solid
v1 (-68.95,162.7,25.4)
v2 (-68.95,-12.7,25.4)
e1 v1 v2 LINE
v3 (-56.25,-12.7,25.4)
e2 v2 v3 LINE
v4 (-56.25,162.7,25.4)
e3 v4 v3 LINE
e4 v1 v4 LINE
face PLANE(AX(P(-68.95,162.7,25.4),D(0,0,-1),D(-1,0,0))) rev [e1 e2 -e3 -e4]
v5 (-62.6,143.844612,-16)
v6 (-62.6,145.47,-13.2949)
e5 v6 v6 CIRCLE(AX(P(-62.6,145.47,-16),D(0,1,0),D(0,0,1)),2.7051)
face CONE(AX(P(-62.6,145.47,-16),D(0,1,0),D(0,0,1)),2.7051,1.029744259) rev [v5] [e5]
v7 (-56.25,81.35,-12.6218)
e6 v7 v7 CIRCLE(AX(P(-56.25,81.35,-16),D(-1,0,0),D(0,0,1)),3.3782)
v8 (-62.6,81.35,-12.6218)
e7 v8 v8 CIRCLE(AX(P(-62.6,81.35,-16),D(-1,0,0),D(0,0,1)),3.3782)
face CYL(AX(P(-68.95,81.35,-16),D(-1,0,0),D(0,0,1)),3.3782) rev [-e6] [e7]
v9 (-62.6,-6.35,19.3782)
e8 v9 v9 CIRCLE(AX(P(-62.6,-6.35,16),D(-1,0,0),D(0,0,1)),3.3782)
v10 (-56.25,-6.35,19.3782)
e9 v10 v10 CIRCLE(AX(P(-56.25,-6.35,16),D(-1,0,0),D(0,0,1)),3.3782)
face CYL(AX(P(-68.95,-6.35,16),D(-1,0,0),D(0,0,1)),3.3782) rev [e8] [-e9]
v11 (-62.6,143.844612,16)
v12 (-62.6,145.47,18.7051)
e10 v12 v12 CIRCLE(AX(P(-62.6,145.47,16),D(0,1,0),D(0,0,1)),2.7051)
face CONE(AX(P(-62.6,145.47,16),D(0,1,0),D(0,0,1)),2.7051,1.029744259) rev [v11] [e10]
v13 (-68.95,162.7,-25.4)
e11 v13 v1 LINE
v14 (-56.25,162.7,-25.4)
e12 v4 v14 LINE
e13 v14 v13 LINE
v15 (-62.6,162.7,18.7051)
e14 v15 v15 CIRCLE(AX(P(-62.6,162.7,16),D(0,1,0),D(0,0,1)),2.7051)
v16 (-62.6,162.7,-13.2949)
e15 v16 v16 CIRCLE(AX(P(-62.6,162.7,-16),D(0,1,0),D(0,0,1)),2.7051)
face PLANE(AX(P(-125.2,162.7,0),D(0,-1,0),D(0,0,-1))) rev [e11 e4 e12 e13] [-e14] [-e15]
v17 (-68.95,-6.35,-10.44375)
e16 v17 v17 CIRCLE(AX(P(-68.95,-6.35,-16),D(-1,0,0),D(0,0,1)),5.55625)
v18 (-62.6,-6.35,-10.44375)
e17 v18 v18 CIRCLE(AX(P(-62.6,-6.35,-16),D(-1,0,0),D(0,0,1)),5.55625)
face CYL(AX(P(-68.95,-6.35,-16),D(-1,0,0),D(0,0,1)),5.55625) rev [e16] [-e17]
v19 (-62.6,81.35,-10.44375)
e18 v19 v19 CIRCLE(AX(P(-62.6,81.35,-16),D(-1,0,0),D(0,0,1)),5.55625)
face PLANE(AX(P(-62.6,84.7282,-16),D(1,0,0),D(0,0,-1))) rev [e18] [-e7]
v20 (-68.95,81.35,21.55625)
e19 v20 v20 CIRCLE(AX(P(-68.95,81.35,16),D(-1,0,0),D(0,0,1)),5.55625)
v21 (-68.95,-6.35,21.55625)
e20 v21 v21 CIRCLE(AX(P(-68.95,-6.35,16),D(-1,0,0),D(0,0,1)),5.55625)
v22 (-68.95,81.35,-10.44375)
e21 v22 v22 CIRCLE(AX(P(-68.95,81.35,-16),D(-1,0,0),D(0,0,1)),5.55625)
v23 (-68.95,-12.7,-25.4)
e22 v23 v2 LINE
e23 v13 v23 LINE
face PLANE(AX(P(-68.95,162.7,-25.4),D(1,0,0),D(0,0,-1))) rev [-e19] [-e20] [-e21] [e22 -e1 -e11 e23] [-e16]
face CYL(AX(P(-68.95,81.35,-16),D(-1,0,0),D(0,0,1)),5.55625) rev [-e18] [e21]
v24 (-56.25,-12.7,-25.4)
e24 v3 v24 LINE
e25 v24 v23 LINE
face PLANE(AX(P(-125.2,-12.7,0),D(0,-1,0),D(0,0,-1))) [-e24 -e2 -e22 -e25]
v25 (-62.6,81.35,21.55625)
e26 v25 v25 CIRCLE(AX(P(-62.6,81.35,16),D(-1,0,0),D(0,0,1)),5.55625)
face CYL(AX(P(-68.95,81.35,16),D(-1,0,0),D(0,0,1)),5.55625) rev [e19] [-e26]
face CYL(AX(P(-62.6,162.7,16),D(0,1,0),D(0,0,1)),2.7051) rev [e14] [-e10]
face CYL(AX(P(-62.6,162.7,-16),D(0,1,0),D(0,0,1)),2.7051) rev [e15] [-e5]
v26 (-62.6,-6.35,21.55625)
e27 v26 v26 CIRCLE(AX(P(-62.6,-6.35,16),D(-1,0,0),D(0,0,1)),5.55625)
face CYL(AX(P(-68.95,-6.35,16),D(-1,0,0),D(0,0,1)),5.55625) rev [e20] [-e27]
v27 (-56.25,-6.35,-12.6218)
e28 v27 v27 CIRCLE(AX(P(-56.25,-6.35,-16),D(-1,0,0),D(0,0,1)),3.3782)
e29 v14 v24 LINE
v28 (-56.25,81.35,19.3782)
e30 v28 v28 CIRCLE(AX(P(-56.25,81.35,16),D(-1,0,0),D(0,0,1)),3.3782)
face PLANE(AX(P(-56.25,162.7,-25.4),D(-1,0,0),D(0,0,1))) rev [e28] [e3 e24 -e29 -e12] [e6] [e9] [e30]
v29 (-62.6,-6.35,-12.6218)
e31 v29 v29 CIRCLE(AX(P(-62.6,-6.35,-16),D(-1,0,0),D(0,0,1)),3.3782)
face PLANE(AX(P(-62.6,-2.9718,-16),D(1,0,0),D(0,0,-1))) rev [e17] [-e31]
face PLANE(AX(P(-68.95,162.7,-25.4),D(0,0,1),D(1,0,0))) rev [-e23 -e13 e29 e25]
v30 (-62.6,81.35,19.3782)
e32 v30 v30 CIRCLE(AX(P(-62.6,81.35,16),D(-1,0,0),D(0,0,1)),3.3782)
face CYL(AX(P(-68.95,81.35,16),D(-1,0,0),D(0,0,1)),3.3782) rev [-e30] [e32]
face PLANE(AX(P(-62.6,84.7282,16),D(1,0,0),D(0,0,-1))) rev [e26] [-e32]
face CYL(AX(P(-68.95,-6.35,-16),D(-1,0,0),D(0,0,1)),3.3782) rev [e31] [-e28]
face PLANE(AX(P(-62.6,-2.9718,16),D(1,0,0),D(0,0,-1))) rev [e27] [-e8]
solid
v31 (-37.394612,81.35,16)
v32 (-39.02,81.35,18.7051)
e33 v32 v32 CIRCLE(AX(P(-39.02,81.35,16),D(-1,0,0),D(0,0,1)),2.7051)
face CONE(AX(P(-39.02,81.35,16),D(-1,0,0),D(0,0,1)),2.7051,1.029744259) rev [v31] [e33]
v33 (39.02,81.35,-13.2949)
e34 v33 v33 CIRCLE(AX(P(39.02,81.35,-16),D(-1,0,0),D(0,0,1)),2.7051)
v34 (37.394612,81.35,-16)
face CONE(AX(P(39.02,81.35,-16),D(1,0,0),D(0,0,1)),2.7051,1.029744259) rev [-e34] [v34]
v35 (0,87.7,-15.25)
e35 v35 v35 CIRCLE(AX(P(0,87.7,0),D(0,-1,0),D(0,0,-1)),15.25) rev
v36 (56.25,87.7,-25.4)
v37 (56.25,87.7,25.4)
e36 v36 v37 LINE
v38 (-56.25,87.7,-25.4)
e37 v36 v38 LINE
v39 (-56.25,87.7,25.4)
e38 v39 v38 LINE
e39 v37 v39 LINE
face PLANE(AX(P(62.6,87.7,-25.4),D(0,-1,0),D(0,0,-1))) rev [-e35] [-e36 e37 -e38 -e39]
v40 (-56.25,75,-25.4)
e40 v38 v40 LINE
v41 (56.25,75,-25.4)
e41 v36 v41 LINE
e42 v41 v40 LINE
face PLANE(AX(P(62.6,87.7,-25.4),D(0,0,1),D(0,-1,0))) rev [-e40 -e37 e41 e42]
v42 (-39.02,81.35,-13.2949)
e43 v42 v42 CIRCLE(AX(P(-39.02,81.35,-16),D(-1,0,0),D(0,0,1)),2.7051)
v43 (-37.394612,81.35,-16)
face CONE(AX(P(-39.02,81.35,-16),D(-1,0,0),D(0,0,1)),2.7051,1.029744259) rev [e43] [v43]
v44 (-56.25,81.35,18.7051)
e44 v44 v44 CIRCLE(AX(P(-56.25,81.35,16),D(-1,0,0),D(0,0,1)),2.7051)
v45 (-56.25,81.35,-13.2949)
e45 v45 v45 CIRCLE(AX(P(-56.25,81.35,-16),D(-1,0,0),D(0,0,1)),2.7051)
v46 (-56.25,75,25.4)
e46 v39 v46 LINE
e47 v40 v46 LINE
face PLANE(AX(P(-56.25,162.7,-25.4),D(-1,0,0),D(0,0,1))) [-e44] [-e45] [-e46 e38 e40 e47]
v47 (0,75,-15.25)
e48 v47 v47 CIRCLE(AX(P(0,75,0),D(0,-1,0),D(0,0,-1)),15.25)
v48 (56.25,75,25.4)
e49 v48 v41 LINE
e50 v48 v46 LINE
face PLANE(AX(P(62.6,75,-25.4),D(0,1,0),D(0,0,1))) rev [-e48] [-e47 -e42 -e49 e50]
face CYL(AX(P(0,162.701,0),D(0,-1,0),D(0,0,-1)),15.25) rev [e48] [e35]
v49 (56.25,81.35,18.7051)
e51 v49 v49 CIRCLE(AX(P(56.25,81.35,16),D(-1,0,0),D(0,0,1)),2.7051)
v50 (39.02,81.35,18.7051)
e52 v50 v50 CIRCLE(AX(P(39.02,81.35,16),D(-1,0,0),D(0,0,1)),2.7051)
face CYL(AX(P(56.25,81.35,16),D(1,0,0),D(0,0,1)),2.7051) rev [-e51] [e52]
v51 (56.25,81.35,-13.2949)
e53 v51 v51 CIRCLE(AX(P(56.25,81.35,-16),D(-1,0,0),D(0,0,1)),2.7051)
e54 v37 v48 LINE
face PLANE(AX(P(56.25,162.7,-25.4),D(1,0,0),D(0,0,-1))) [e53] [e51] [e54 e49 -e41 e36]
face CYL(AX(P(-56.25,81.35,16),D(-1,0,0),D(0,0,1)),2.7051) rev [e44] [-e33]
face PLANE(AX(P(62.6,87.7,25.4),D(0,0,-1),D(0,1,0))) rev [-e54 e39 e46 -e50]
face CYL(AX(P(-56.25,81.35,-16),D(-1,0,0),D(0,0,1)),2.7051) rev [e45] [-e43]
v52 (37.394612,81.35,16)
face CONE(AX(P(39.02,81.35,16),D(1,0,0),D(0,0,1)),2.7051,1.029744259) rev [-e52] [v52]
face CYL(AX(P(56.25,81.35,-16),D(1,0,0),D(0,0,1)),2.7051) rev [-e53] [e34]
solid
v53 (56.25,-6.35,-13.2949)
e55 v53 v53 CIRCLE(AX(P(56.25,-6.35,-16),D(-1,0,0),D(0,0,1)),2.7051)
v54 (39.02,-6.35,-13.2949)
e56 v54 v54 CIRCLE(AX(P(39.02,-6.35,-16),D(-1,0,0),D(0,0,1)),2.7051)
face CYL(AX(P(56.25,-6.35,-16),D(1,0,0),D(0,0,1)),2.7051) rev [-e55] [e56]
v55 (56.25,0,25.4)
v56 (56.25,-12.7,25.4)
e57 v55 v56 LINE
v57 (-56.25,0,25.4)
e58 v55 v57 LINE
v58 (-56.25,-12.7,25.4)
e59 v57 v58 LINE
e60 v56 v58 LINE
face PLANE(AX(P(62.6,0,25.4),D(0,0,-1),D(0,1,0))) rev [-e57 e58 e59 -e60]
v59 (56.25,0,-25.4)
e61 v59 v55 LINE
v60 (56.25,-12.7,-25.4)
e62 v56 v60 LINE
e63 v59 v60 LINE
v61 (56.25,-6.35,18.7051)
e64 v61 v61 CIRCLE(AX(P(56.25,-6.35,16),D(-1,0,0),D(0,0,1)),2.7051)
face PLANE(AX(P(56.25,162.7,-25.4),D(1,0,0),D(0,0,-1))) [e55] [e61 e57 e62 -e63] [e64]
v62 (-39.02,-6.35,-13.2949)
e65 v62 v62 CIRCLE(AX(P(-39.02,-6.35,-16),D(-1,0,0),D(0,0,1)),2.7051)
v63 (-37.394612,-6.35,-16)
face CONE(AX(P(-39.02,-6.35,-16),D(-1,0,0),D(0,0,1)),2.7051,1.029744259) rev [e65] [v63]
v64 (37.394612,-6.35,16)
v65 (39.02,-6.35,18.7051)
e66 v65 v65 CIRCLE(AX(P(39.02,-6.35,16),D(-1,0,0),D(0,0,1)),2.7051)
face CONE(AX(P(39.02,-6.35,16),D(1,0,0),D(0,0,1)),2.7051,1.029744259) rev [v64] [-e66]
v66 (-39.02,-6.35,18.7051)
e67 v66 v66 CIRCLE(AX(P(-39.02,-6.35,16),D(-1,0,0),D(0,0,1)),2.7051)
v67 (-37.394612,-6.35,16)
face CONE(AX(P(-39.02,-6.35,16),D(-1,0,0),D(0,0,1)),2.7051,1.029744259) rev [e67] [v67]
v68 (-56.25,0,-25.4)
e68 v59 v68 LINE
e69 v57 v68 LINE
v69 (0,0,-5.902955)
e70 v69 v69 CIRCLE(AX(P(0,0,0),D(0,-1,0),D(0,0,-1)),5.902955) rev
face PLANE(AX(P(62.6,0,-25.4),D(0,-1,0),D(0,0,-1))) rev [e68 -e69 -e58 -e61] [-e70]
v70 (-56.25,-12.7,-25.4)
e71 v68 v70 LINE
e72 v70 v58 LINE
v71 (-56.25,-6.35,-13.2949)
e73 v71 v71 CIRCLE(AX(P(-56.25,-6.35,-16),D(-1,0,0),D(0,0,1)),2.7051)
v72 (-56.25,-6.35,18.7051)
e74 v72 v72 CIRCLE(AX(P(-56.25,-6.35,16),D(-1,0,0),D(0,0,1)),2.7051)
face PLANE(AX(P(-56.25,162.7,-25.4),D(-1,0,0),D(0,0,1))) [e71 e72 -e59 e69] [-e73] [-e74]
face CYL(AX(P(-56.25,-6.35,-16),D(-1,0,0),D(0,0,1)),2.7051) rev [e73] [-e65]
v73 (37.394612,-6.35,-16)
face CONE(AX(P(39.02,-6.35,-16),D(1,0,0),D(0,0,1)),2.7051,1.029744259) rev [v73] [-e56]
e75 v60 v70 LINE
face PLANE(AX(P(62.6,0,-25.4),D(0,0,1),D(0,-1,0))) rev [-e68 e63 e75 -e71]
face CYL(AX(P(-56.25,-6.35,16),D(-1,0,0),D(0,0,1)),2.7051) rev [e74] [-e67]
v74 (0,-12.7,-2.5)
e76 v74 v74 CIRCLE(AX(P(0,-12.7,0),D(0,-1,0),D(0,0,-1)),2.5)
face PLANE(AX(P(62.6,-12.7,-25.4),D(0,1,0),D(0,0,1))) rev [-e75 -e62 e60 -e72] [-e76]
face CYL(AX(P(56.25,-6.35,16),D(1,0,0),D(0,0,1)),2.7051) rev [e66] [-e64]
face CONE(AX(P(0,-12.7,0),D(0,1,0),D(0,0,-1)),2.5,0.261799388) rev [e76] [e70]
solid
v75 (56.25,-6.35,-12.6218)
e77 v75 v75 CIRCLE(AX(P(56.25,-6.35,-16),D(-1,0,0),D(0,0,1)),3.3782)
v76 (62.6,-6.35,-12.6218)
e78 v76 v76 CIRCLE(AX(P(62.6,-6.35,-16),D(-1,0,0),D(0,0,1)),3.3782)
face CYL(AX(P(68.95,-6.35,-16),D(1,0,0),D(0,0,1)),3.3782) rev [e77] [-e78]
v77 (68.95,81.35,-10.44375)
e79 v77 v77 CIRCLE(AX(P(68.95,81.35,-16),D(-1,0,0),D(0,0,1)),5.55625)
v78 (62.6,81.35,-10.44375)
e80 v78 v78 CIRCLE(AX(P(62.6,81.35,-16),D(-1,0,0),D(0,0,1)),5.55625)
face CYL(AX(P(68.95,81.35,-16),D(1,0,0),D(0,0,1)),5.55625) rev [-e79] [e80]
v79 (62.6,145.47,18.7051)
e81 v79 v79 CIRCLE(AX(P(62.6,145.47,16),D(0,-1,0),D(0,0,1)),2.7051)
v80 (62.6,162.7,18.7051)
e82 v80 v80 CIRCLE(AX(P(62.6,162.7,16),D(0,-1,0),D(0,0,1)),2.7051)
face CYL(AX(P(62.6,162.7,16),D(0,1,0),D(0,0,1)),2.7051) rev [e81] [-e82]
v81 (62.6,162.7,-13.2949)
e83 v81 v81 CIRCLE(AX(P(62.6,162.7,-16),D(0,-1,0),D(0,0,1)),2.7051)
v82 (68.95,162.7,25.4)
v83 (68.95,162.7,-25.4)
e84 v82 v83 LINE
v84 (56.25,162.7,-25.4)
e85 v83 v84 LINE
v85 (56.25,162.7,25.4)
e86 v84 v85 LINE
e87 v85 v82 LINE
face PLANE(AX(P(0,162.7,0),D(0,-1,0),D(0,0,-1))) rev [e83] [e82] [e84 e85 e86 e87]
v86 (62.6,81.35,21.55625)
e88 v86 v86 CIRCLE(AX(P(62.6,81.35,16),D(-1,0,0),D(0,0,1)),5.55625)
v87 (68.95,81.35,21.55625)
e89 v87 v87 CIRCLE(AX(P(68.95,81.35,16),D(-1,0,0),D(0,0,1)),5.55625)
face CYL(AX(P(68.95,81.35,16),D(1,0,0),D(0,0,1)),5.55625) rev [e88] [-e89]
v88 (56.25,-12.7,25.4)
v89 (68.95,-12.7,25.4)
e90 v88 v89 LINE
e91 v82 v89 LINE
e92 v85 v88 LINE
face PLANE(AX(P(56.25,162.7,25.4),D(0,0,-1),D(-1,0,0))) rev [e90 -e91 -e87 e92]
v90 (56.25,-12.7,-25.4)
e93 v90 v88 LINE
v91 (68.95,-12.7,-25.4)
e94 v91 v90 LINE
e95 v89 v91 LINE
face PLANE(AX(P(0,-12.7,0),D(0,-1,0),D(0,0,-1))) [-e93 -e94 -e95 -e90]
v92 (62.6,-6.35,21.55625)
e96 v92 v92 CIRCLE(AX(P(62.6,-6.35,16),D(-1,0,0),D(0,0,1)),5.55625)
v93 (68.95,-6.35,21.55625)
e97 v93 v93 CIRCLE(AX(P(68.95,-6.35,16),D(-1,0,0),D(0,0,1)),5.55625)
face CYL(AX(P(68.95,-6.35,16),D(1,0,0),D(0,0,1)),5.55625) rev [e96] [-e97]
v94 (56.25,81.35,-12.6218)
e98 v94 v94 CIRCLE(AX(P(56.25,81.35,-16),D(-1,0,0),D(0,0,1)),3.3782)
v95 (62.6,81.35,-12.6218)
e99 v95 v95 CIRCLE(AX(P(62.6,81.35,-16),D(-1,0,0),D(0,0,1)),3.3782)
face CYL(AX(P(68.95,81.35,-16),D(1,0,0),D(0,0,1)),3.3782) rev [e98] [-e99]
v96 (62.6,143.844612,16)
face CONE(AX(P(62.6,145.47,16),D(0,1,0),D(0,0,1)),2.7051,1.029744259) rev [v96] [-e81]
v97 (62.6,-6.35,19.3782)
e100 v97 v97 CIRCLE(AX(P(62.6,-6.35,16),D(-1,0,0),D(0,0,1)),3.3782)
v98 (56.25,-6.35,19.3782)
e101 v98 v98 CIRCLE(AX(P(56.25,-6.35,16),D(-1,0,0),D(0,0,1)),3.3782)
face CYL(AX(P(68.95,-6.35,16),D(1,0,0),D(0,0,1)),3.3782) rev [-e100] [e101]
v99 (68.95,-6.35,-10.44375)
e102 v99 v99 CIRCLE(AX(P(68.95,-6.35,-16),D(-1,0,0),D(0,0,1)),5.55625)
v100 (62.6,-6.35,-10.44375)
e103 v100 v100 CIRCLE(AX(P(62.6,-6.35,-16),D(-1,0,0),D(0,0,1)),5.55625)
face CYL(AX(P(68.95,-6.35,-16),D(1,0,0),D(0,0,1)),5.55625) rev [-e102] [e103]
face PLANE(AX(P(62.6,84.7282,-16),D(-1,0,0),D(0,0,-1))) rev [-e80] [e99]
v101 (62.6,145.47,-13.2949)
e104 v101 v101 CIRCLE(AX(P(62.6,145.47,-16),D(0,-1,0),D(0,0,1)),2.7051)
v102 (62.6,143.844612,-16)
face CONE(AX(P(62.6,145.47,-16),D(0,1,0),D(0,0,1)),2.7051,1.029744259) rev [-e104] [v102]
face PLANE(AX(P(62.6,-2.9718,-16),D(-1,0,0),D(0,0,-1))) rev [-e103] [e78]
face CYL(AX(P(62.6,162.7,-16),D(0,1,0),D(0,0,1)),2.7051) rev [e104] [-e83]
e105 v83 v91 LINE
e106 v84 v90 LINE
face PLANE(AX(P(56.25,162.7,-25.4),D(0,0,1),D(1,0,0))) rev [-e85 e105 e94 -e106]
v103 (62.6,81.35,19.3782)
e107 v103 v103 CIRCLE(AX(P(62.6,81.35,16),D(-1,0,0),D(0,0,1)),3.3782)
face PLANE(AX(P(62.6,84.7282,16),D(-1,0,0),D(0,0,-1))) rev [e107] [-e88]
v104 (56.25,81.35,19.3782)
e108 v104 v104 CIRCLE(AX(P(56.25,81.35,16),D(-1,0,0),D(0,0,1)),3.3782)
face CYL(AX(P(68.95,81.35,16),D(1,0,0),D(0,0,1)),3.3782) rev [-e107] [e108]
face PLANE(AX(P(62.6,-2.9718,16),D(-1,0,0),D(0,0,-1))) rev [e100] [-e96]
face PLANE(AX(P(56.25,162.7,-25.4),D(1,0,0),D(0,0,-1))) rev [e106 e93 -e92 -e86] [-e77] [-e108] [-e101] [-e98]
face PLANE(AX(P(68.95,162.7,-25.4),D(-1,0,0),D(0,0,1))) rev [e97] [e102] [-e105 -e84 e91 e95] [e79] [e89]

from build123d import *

# Parameters (mm, degrees)
CROQUIS13_W                                 = 50.8
CROQUIS13_H                                 = 12.7
SOLID_2_X_0_5_2_DEPTH                       = 175.4
CROQUIS13_ON_SEGMENT_2_W                    = 50.8
CROQUIS13_ON_SEGMENT_2_H                    = 12.7
SOLID_2_X_0_5_2_2_DEPTH                     = 175.4
CROQUIS13_ON_SEGMENT_3_W                    = 50.8
CROQUIS13_ON_SEGMENT_3_H                    = 12.7
SOLID_2_X_0_5_2_3_DEPTH                     = 127.2
CROQUIS13_ON_SEGMENT_4_W                    = 50.8
CROQUIS13_ON_SEGMENT_4_H                    = 12.7
SOLID_2_X_0_5_2_4_DEPTH                     = 127.2
REFRENTADO_PARA_TORNILLO_CON_CABEZA_2_COUNT = 2
REFRENTADO_PARA_TORNILLO_CON_CABEZA_2_PITCH = 87.7
REFRENTADO_PARA_TORNILLO_CON_CABEZA_3_COUNT = 2
REFRENTADO_PARA_TORNILLO_CON_CABEZA_3_PITCH = 93.355717554
REFRENTADO_PARA_TORNILLO_CON_CABEZA_4_COUNT = 2
REFRENTADO_PARA_TORNILLO_CON_CABEZA_4_PITCH = 32
SIMETR_A1_START                             = 62.6
SIMETR_A1_OUTLINE_R                         = 5.55625
SIMETR_A1_DEPTH                             = 6.35
SIMETR_A1_START_2                           = 56.25
SIMETR_A1_2_OUTLINE_R                       = 3.3782
SIMETR_A1_2_DEPTH                           = 6.35
CROQUIS19_R                                 = 15.25
CORTAR_EXTRUIR1_DEPTH                       = 12.7
CROQUIS20_R                                 = 2.5
CORTAR_EXTRUIR2_DEPTH                       = 12.7
CORTAR_EXTRUIR2_DRAFT                       = 15


# Read off the part's stored shape, not the designer's step: Simetría1
with BuildPart() as part:
    # Croquis13 → Solid 2 X 0.5(2) (new body)
    with BuildSketch(Plane(origin=(62.6, -12.7, 0), x_dir=(0, 0, 1), z_dir=(0, 1, 0))):
        Rectangle(CROQUIS13_W, CROQUIS13_H)
    extrude(amount=SOLID_2_X_0_5_2_DEPTH)

    # Simetría1 outline → Simetría1 (cut)
    with BuildSketch(Plane.YZ.offset(SIMETR_A1_START)):
        with Locations((-6.35, -16)):
            Circle(SIMETR_A1_OUTLINE_R)
        with Locations((81.35, -16)):
            Circle(SIMETR_A1_OUTLINE_R)
        with Locations((81.35, 16)):
            Circle(SIMETR_A1_OUTLINE_R)
        with Locations((-6.35, 16)):
            Circle(SIMETR_A1_OUTLINE_R)
    extrude(amount=SIMETR_A1_DEPTH, mode=Mode.SUBTRACT)

    # Simetr_a1 2 outline → Simetr_a1 2 (cut)
    with BuildSketch(Plane.YZ.offset(SIMETR_A1_START_2)):
        with Locations((-6.35, -16)):
            Circle(SIMETR_A1_2_OUTLINE_R)
        with Locations((81.35, -16)):
            Circle(SIMETR_A1_2_OUTLINE_R)
        with Locations((81.35, 16)):
            Circle(SIMETR_A1_2_OUTLINE_R)
        with Locations((-6.35, 16)):
            Circle(SIMETR_A1_2_OUTLINE_R)
    extrude(amount=SIMETR_A1_2_DEPTH, mode=Mode.SUBTRACT)

    # Simetr_a1 7 outline → Simetr_a1 7 (revolve, cut)
    with BuildSketch(Plane(origin=(62.6, 0, 16), x_dir=(1, 0, 0), z_dir=(0, 0, 1))):
        Polygon((0, 162.7), (0, 143.844611939), (2.7051, 145.47), (2.7051, 162.7), align=None)
    revolve(axis=Axis((62.6, 0, 16), (0, 1, 0)), mode=Mode.SUBTRACT)

    # Simetr_a1 8 outline → Simetr_a1 8 (revolve, cut)
    with BuildSketch(Plane(origin=(62.6, 0, -16), x_dir=(1, 0, 0), z_dir=(0, 0, 1))):
        Polygon((0, 162.7), (0, 143.844611939), (2.7051, 145.47), (2.7051, 162.7), align=None)
    revolve(axis=Axis((62.6, 0, -16), (0, 1, 0)), mode=Mode.SUBTRACT)


with BuildPart() as body_2:
    # Croquis13 on segment 2 (carried to segment 2) → Solid 2 X 0.5_2 2 (new body)
    with BuildSketch(Plane(origin=(-62.6, -12.7, 0), x_dir=(0, 0, 1), z_dir=(0, 1, 0))):
        Rectangle(CROQUIS13_ON_SEGMENT_2_W, CROQUIS13_ON_SEGMENT_2_H)
    extrude(amount=SOLID_2_X_0_5_2_2_DEPTH)

    # Croquis15 → Refrentado para tornillo con cabeza hueca de 1/41 (revolve, cut)
    with BuildSketch(Plane(origin=(-68.95, -6.35, 16), x_dir=(0, 0, 1), z_dir=(0, 1, 0))):
        Polygon((0, 0), (0, 137.9), (3.3782, 137.9), (3.3782, 6.35), (5.55625, 6.35), (5.55625, 0), align=None)
    refrentado_para_tornillo_con_cabeza_huec = revolve(axis=Axis((-75.3, -6.35, 16), (1, 0, 0)), mode=Mode.SUBTRACT)

    # Refrentado para tornillo con cabeza  2: Refrentado para tornillo con cabeza hueca de 1/41 ×2
    with Locations(*[(0, i * REFRENTADO_PARA_TORNILLO_CON_CABEZA_2_PITCH, 0) for i in range(1, REFRENTADO_PARA_TORNILLO_CON_CABEZA_2_COUNT)]):
        add(refrentado_para_tornillo_con_cabeza_huec, mode=Mode.SUBTRACT)

    # Refrentado para tornillo con cabeza  3: Refrentado para tornillo con cabeza hueca de 1/41 ×2
    with Locations(*[Vector(-1.1702116215866835e-15, 0.9394175557526336, -0.3427749348242189) * (i * REFRENTADO_PARA_TORNILLO_CON_CABEZA_3_PITCH) for i in range(1, REFRENTADO_PARA_TORNILLO_CON_CABEZA_3_COUNT)]):
        add(refrentado_para_tornillo_con_cabeza_huec, mode=Mode.SUBTRACT)

    # Refrentado para tornillo con cabeza  4: Refrentado para tornillo con cabeza hueca de 1/41 ×2
    with Locations(*[(0, 0, -i * REFRENTADO_PARA_TORNILLO_CON_CABEZA_4_PITCH) for i in range(1, REFRENTADO_PARA_TORNILLO_CON_CABEZA_4_COUNT)]):
        add(refrentado_para_tornillo_con_cabeza_huec, mode=Mode.SUBTRACT)

    # Croquis18 at point 3 (carried to point 3, square into its face) → Taladro roscado 1/4-282 at 3 (revolve, cut)
    with BuildSketch(Plane(origin=(-62.6, 162.7, 16), x_dir=(0, 0, 1), z_dir=(1, 0, 0))):
        Polygon((0, 0), (0, 18.855388061), (2.7051, 17.23), (2.7051, 0), align=None)
    revolve(axis=Axis((-62.6, 169.05, 16), (0, -1, 0)), mode=Mode.SUBTRACT)

    # Croquis18 at point 6 (carried to point 6, square into its face) → Taladro roscado 1/4-282 at 6 (revolve, cut)
    with BuildSketch(Plane(origin=(-62.6, 162.7, -16), x_dir=(0, 0, 1), z_dir=(1, 0, 0))):
        Polygon((0, 0), (0, 18.855388061), (2.7051, 17.23), (2.7051, 0), align=None)
    revolve(axis=Axis((-62.6, 169.05, -16), (0, -1, 0)), mode=Mode.SUBTRACT)


with BuildPart() as body_3:
    # Croquis13 on segment 3 (carried to segment 3) → Solid 2 X 0.5_2 3 (new body)
    with BuildSketch(Plane(origin=(-63.6, 81.35, 0), x_dir=(0, 0, 1), z_dir=(1, 0, 0))):
        Rectangle(CROQUIS13_ON_SEGMENT_3_W, CROQUIS13_ON_SEGMENT_3_H)
    extrude(amount=SOLID_2_X_0_5_2_3_DEPTH)

    # Solid 2 X 0.5_2 3 end butt 1
    split(bisect_by=Plane(origin=(-56.25, 81.35, 0), x_dir=(0, 1, 0), z_dir=(1, 0, 0)), keep=Keep.TOP)

    # Solid 2 X 0.5_2 3 end butt 2
    split(bisect_by=Plane(origin=(56.25, 81.35, 0), x_dir=(0, -1, 0), z_dir=(-1, 0, 0)), keep=Keep.TOP)

    # Croquis18 at point 2 (carried to point 2, square into its face) → Taladro roscado 1/4-282 at 2 (revolve, cut)
    with BuildSketch(Plane(origin=(-56.25, 81.35, 16), x_dir=(0, 0, 1), z_dir=(0, 1, 0))):
        Polygon((0, 0), (0, 18.855388061), (2.7051, 17.23), (2.7051, 0), align=None)
    revolve(axis=Axis((-62.6, 81.35, 16), (1, 0, 0)), mode=Mode.SUBTRACT)

    # Croquis18 at point 5 (carried to point 5, square into its face) → Taladro roscado 1/4-282 at 5 (revolve, cut)
    with BuildSketch(Plane(origin=(-56.25, 81.35, -16), x_dir=(0, 0, 1), z_dir=(0, 1, 0))):
        Polygon((0, 0), (0, 18.855388061), (2.7051, 17.23), (2.7051, 0), align=None)
    revolve(axis=Axis((-62.6, 81.35, -16), (1, 0, 0)), mode=Mode.SUBTRACT)

    # Simetr_a1 3 outline → Simetr_a1 3 (revolve, cut)
    with BuildSketch(Plane(origin=(0, 81.35, -16), x_dir=(0, 1, 0), z_dir=(0, 0, -1))):
        Polygon((0, 37.394611939), (2.7051, 39.02), (2.7051, 56.25), (0, 56.25), align=None)
    revolve(axis=Axis((0, 81.35, -16), (1, 0, 0)), mode=Mode.SUBTRACT)

    # Simetr_a1 4 outline → Simetr_a1 4 (revolve, cut)
    with BuildSketch(Plane(origin=(0, 81.35, 16), x_dir=(0, 1, 0), z_dir=(0, 0, -1))):
        Polygon((0, 37.394611939), (2.7051, 39.02), (2.7051, 56.25), (0, 56.25), align=None)
    revolve(axis=Axis((0, 81.35, 16), (1, 0, 0)), mode=Mode.SUBTRACT)

    # Croquis19 → Cortar-Extruir1 (cut)
    with BuildSketch(Plane.XZ.offset(-75)):
        with Locations(Location((0, 0, 0), (0, 0, 270))):
            Circle(CROQUIS19_R)
    extrude(amount=-CORTAR_EXTRUIR1_DEPTH, mode=Mode.SUBTRACT)


with BuildPart() as body_4:
    # Croquis13 on segment 4 (carried to segment 4) → Solid 2 X 0.5_2 4 (new body)
    with BuildSketch(Plane(origin=(63.6, -6.35, 0), x_dir=(0, 0, 1), z_dir=(-1, 0, 0))):
        Rectangle(CROQUIS13_ON_SEGMENT_4_W, CROQUIS13_ON_SEGMENT_4_H)
    extrude(amount=SOLID_2_X_0_5_2_4_DEPTH)

    # Solid 2 X 0.5_2 4 end butt 1
    split(bisect_by=Plane(origin=(56.25, -6.35, 0), x_dir=(0, -1, 0), z_dir=(-1, 0, 0)), keep=Keep.TOP)

    # Solid 2 X 0.5_2 4 end butt 2
    split(bisect_by=Plane(origin=(-56.25, -6.35, 0), x_dir=(0, 1, 0), z_dir=(1, 0, 0)), keep=Keep.TOP)

    # Croquis18 → Taladro roscado 1/4-282 (revolve, cut)
    with BuildSketch(Plane(origin=(-56.25, -6.35, 16), x_dir=(0, 0, 1), z_dir=(0, 1, 0))):
        Polygon((0, 0), (0, 18.855388061), (2.7051, 17.23), (2.7051, 0), align=None)
    revolve(axis=Axis((-62.6, -6.35, 16), (1, 0, 0)), mode=Mode.SUBTRACT)

    # Croquis18 at point 4 (carried to point 4, square into its face) → Taladro roscado 1/4-282 at 4 (revolve, cut)
    with BuildSketch(Plane(origin=(-56.25, -6.35, -16), x_dir=(0, 0, 1), z_dir=(0, 1, 0))):
        Polygon((0, 0), (0, 18.855388061), (2.7051, 17.23), (2.7051, 0), align=None)
    revolve(axis=Axis((-62.6, -6.35, -16), (1, 0, 0)), mode=Mode.SUBTRACT)

    # Simetr_a1 5 outline → Simetr_a1 5 (revolve, cut)
    with BuildSketch(Plane(origin=(0, -6.35, -16), x_dir=(0, 1, 0), z_dir=(0, 0, -1))):
        Polygon((0, 37.394611939), (2.7051, 39.02), (2.7051, 56.25), (0, 56.25), align=None)
    revolve(axis=Axis((0, -6.35, -16), (1, 0, 0)), mode=Mode.SUBTRACT)

    # Simetr_a1 6 outline → Simetr_a1 6 (revolve, cut)
    with BuildSketch(Plane(origin=(0, -6.35, 16), x_dir=(0, 1, 0), z_dir=(0, 0, -1))):
        Polygon((0, 37.394611939), (2.7051, 39.02), (2.7051, 56.25), (0, 56.25), align=None)
    revolve(axis=Axis((0, -6.35, 16), (1, 0, 0)), mode=Mode.SUBTRACT)


with BuildPart() as cortar_extruir2_tool:
    # Croquis20 → Cortar-Extruir2 (with draft: the straight prism first)
    with BuildSketch(Plane.XZ.offset(12.7)):
        Circle(CROQUIS20_R)
    extrude(amount=-CORTAR_EXTRUIR2_DEPTH)
    # Cortar-Extruir2: the draft: its side faces are tilted about the plane it starts from
    cortar_extruir2_sides = [cortar_extruir2_tool.faces().sort_by_distance(p)[0] for p in [
        (-2.5, -6.35, 0),
    ]]
    draft(cortar_extruir2_sides, Plane.XZ.offset(12.7), CORTAR_EXTRUIR2_DRAFT)


with BuildPart() as body_4_1:
    add(body_4.part)

    # Cortar-Extruir2: cut by cortar_extruir2_tool
    add(cortar_extruir2_tool.part, mode=Mode.SUBTRACT)


solid = Compound([part.part, body_2.part, body_3.part, body_4_1.part])
